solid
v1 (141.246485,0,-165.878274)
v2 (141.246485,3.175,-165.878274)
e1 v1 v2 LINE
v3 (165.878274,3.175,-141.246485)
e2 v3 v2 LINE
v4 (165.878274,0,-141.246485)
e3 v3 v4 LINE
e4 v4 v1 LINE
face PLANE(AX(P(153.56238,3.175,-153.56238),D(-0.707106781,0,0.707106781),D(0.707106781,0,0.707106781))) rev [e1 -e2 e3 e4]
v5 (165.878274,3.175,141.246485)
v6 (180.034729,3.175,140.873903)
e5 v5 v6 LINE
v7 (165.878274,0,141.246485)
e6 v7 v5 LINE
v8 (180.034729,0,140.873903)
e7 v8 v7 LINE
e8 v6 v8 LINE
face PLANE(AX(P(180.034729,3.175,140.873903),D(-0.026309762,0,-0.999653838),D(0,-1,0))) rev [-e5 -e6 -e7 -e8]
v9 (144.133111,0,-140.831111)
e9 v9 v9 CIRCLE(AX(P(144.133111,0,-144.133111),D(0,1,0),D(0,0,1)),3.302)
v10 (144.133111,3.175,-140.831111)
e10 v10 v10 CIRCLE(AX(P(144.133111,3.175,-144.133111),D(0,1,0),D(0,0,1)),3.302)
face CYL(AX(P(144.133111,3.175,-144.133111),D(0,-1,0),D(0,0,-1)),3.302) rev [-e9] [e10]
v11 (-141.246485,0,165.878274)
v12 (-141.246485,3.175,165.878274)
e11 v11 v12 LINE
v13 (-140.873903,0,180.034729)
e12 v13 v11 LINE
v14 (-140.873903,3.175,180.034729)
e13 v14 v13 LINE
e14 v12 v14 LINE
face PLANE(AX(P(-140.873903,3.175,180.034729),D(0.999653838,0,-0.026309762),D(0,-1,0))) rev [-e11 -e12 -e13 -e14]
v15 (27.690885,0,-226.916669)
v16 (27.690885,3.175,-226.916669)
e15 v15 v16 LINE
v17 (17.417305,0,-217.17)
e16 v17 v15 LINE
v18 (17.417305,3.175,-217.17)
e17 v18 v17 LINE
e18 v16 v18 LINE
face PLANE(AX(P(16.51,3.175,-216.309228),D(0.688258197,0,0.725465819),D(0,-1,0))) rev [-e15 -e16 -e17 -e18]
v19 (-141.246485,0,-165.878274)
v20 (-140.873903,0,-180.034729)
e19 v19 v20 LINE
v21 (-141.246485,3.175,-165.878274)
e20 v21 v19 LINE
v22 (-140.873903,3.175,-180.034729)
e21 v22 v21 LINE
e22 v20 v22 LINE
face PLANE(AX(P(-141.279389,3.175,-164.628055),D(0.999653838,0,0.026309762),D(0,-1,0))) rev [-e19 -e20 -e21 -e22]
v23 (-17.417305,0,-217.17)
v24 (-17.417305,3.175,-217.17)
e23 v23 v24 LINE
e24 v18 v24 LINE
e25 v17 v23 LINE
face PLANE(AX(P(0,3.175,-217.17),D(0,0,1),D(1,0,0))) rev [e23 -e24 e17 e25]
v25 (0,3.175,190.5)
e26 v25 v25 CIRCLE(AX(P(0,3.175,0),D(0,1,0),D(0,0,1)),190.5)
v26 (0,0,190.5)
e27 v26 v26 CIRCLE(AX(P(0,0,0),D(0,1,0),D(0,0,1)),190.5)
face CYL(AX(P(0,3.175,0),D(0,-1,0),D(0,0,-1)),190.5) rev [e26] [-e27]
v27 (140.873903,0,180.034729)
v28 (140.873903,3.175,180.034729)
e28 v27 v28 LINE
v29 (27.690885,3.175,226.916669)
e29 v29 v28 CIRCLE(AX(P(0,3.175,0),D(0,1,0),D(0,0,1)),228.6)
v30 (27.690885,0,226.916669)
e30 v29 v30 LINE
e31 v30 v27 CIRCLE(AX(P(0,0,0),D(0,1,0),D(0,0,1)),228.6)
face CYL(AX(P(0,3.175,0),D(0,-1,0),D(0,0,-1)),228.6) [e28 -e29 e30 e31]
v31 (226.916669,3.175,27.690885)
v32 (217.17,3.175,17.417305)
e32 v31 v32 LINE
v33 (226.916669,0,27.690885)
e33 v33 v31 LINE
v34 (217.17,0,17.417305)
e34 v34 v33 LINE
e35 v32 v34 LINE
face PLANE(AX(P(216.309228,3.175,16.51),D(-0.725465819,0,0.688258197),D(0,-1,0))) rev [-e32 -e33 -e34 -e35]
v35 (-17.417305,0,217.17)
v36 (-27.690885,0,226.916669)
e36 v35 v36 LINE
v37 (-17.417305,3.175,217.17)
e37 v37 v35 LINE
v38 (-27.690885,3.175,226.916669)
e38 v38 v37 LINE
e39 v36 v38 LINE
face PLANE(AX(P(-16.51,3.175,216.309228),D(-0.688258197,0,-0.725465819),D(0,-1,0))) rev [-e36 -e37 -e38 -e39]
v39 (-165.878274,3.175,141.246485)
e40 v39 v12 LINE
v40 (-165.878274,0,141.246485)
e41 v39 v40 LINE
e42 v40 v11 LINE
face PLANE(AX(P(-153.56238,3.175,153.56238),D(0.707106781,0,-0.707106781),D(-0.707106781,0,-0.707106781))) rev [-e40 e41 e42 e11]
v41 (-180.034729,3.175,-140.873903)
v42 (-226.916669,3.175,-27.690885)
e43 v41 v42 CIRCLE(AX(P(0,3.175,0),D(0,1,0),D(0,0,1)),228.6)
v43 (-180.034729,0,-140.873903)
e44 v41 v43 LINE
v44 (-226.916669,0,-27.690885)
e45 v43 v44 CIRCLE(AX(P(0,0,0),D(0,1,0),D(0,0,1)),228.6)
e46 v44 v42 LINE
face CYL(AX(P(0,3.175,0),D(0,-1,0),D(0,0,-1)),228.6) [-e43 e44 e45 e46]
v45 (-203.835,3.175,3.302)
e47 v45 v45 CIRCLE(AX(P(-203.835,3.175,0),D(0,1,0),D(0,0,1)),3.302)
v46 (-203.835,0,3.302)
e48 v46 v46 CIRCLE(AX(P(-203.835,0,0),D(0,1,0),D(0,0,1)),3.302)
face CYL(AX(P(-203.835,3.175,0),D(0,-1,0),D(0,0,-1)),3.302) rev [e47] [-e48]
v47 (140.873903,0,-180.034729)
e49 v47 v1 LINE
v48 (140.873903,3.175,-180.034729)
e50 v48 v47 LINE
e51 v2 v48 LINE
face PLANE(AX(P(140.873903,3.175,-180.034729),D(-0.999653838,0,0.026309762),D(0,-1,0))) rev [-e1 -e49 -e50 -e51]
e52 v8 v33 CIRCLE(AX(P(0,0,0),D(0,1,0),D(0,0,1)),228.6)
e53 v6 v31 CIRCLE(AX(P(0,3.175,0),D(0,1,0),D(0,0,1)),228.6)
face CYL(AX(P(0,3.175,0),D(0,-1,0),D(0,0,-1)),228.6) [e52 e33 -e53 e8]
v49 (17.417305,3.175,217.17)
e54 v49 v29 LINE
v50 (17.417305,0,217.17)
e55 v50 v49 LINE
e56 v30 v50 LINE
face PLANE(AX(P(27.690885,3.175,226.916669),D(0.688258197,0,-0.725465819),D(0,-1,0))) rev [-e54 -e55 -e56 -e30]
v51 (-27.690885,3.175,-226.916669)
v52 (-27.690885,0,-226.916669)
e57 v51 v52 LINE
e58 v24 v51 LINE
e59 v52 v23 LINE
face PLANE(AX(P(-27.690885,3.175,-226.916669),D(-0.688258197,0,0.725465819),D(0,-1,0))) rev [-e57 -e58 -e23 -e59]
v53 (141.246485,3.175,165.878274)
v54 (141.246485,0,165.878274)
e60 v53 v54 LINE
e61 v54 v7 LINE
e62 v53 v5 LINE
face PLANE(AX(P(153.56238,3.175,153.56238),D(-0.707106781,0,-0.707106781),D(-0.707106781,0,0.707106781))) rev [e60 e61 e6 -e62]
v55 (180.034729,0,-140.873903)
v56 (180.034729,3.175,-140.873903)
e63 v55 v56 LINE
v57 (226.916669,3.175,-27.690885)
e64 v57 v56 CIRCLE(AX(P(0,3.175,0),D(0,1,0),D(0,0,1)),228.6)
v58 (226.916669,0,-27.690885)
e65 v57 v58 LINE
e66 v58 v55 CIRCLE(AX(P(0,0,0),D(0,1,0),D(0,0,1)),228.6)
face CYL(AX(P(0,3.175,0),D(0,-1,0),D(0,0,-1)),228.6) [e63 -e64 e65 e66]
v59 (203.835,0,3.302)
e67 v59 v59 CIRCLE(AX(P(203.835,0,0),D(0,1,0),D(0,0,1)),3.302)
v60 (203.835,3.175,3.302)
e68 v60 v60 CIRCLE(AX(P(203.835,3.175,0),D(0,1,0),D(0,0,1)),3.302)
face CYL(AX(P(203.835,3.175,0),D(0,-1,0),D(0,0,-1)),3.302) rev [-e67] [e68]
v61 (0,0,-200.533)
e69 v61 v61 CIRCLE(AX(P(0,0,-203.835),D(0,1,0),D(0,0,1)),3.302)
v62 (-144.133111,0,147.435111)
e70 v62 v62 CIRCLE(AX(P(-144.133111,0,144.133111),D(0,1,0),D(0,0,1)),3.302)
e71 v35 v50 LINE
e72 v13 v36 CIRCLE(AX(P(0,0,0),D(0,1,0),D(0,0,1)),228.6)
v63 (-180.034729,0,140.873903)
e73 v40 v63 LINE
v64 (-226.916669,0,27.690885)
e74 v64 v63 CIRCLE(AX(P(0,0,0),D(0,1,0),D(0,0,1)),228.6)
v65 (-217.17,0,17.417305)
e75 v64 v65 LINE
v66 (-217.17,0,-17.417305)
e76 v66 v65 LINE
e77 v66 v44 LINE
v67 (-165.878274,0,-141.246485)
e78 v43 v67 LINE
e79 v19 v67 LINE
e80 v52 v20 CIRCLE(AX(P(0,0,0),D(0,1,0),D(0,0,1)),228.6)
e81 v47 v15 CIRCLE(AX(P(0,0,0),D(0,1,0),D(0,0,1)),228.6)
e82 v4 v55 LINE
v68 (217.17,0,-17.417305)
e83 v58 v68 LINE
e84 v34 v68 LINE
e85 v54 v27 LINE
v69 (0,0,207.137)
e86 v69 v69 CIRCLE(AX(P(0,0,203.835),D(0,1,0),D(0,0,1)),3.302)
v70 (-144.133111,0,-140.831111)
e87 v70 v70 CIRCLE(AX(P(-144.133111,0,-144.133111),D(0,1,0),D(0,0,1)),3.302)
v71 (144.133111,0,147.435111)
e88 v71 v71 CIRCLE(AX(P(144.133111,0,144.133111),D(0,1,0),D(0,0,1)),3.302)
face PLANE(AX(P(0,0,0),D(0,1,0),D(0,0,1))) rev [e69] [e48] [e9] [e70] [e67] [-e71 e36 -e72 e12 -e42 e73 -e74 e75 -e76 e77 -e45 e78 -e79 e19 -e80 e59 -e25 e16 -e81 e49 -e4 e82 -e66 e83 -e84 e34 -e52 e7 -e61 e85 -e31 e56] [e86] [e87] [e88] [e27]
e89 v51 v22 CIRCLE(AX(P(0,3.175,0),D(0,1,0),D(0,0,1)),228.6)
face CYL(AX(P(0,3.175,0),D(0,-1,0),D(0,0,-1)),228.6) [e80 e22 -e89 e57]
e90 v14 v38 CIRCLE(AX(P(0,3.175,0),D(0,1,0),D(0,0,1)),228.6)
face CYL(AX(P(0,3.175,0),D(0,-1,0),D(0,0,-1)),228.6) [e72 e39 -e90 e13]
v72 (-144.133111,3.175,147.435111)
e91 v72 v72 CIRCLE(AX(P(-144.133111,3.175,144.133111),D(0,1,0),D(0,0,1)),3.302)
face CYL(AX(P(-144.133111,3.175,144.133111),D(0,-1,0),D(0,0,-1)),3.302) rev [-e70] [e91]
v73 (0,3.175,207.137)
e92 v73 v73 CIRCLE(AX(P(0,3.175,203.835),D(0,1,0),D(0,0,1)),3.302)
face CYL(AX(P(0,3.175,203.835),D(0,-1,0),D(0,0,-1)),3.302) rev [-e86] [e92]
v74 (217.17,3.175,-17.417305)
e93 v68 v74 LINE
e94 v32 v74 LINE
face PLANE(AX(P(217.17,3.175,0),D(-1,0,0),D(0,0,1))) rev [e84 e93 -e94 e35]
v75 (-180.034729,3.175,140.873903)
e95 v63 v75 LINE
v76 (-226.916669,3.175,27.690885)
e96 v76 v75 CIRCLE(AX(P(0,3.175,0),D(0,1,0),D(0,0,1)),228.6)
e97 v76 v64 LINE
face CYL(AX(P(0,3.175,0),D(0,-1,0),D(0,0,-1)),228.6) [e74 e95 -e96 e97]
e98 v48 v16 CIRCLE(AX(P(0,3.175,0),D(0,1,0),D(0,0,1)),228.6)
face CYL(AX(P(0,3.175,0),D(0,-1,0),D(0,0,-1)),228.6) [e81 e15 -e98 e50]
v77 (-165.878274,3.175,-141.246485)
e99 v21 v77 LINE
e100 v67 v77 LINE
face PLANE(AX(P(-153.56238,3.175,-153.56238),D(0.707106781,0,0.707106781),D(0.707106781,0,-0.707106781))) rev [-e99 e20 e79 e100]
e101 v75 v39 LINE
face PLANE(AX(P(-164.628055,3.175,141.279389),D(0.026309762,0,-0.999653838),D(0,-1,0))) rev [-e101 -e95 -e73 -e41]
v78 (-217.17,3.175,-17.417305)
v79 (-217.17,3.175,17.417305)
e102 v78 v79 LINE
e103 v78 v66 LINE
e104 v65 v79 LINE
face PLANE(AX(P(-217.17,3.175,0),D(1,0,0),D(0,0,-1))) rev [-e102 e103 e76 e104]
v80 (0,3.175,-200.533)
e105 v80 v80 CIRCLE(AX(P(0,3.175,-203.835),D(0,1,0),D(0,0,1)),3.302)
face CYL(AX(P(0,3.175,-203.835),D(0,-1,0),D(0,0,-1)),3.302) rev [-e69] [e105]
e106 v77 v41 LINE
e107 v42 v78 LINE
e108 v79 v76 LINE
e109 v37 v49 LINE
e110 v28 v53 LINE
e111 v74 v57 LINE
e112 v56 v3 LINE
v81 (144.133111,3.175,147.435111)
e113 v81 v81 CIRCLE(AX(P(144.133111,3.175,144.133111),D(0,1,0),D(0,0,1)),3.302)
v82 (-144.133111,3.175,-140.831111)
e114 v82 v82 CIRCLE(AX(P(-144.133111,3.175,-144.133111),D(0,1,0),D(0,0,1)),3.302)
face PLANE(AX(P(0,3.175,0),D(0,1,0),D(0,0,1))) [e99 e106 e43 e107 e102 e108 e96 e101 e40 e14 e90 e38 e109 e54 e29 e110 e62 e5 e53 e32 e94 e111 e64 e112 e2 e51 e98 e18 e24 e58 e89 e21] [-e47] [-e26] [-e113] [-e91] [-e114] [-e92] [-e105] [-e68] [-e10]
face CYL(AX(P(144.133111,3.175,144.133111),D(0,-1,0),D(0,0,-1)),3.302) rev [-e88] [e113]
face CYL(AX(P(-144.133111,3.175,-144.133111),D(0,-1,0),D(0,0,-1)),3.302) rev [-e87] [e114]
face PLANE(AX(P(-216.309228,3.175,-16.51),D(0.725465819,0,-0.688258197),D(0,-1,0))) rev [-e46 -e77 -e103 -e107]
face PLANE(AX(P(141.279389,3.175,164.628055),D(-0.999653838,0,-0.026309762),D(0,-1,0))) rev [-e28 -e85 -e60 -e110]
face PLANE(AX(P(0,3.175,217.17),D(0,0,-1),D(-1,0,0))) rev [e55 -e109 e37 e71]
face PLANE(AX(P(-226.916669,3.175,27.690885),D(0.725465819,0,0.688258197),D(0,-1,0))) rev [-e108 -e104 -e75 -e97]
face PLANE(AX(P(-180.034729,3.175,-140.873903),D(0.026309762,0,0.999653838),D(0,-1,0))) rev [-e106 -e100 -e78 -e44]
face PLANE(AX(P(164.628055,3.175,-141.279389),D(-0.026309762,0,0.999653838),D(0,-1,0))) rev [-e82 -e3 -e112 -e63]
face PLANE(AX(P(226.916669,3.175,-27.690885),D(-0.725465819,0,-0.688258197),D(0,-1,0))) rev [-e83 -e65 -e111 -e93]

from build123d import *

# Parameters (mm, degrees)
SKETCH1_R           = 3.302
SKETCH1_R_2         = 190.5
BOSS_EXTRUDE1_DEPTH = 3.175
CHAMFER1_DEPTH      = 3.175


with BuildPart() as part:
    # Sketch1 → Boss-Extrude1 (new body)
    with BuildSketch(Plane(origin=(0, 0, 0), x_dir=(1, 0, 0), z_dir=(0, 1, 0))):
        with BuildLine():
            Line((228.003026076, -16.51), (217.17, -16.51))
            Line((217.17, -16.51), (217.17, 16.51))
            Line((217.17, 16.51), (228.003026076, 16.51))
            ThreePointArc((228.003026076, 16.51), (211.198861132, 87.481432639), (172.896818827, 149.548152912))
            Line((172.896818827, 149.548152912), (165.236712628, 141.888046713))
            Line((165.236712628, 141.888046713), (141.888046713, 165.236712628))
            Line((141.888046713, 165.236712628), (149.548152912, 172.896818827))
            ThreePointArc((149.548152912, 172.896818827), (87.481432639, 211.198861132), (16.51, 228.003026076))
            Line((16.51, 228.003026076), (16.51, 217.17))
            Line((16.51, 217.17), (-16.51, 217.17))
            Line((-16.51, 217.17), (-16.51, 228.003026076))
            ThreePointArc((-16.51, 228.003026076), (-87.481432639, 211.198861132), (-149.548152912, 172.896818827))
            Line((-149.548152912, 172.896818827), (-141.888046713, 165.236712628))
            Line((-141.888046713, 165.236712628), (-165.236712628, 141.888046713))
            Line((-165.236712628, 141.888046713), (-172.896818827, 149.548152912))
            ThreePointArc((-172.896818827, 149.548152912), (-211.198861132, 87.481432639), (-228.003026076, 16.51))
            Line((-228.003026076, 16.51), (-217.17, 16.51))
            Line((-217.17, 16.51), (-217.17, -16.51))
            Line((-217.17, -16.51), (-228.003026076, -16.51))
            ThreePointArc((-228.003026076, -16.51), (-211.198861132, -87.481432639), (-172.896818827, -149.548152912))
            Line((-172.896818827, -149.548152912), (-165.236712628, -141.888046713))
            Line((-165.236712628, -141.888046713), (-141.888046713, -165.236712628))
            Line((-141.888046713, -165.236712628), (-149.548152912, -172.896818827))
            ThreePointArc((-149.548152912, -172.896818827), (-87.481432639, -211.198861132), (-16.51, -228.003026076))
            Line((-16.51, -228.003026076), (-16.51, -217.17))
            Line((-16.51, -217.17), (16.51, -217.17))
            Line((16.51, -217.17), (16.51, -228.003026076))
            ThreePointArc((16.51, -228.003026076), (87.481432639, -211.198861132), (149.548152912, -172.896818827))
            Line((149.548152912, -172.896818827), (141.888046713, -165.236712628))
            Line((141.888046713, -165.236712628), (165.236712628, -141.888046713))
            Line((165.236712628, -141.888046713), (172.896818827, -149.548152912))
            ThreePointArc((172.896818827, -149.548152912), (211.198861132, -87.481432639), (228.003026076, -16.51))
        make_face()
        with Locations(Location((-144.133110743, -144.133110743, 0), (0, 0, 270))):
            Circle(SKETCH1_R, mode=Mode.SUBTRACT)
        with Locations(Location((0, -203.835, 0), (0, 0, 270))):
            Circle(SKETCH1_R, mode=Mode.SUBTRACT)
        with Locations(Location((144.133110743, -144.133110743, 0), (0, 0, 270))):
            Circle(SKETCH1_R, mode=Mode.SUBTRACT)
        with Locations(Location((203.835, 0, 0), (0, 0, 270))):
            Circle(SKETCH1_R, mode=Mode.SUBTRACT)
        with Locations(Location((-203.835, 0, 0), (0, 0, 270))):
            Circle(SKETCH1_R, mode=Mode.SUBTRACT)
        with Locations(Location((-144.133110743, 144.133110743, 0), (0, 0, 270))):
            Circle(SKETCH1_R, mode=Mode.SUBTRACT)
        with Locations(Location((0, 0, 0), (0, 0, 270))):
            Circle(SKETCH1_R_2, mode=Mode.SUBTRACT)
        with Locations(Location((0, 203.835, 0), (0, 0, 270))):
            Circle(SKETCH1_R, mode=Mode.SUBTRACT)
        with Locations(Location((144.133110743, 144.133110743, 0), (0, 0, 270))):
            Circle(SKETCH1_R, mode=Mode.SUBTRACT)
    extrude(amount=BOSS_EXTRUDE1_DEPTH)

    # Chamfer1: read off the stored shape, not the designer's step
    # Chamfer1 outline → Chamfer1 (cut)
    with BuildSketch(Plane(origin=(0, 0, 0), x_dir=(1, 0, 0), z_dir=(0, 1, 0))):
        with BuildLine():
            ThreePointArc((228.003026076, 16.51), (227.528537531, 22.1071167), (226.916669439, 27.690885335))
            Line((226.916669439, 27.690885335), (217.17, 17.417305498))
            Line((217.17, 17.417305498), (217.17, 16.51))
            Line((217.17, 16.51), (228.003026076, 16.51))
        make_face()
        with BuildLine():
            Line((165.878274498, 141.246484842), (180.034728522, 140.873902927))
            ThreePointArc((180.034728522, 140.873902927), (176.519063933, 145.254879671), (172.896818827, 149.548152912))
            Line((172.896818827, 149.548152912), (165.236712628, 141.888046713))
            Line((165.236712628, 141.888046713), (165.878274498, 141.246484842))
        make_face()
        with BuildLine():
            Line((228.003026076, -16.51), (217.17, -16.51))
            Line((217.17, -16.51), (217.17, -17.417305498))
            Line((217.17, -17.417305498), (226.916669439, -27.690885335))
            ThreePointArc((226.916669439, -27.690885335), (227.528537531, -22.1071167), (228.003026076, -16.51))
        make_face()
        with BuildLine():
            Line((141.246484842, 165.878274498), (141.888046712, 165.236712627))
            Line((141.888046712, 165.236712627), (149.548152912, 172.896818827))
            ThreePointArc((149.548152912, 172.896818827), (145.254879671, 176.519063933), (140.873902927, 180.034728522))
            Line((140.873902927, 180.034728522), (141.246484842, 165.878274498))
        make_face()
        with BuildLine():
            ThreePointArc((172.896818827, -149.548152912), (176.519063933, -145.254879671), (180.034728522, -140.873902927))
            Line((180.034728522, -140.873902927), (165.878274498, -141.246484842))
            Line((165.878274498, -141.246484842), (165.236712627, -141.888046712))
            Line((165.236712627, -141.888046712), (172.896818827, -149.548152912))
        make_face()
        with BuildLine():
            Line((17.417305498, 217.17), (27.690885335, 226.916669439))
            ThreePointArc((27.690885335, 226.916669439), (22.1071167, 227.528537531), (16.51, 228.003026076))
            Line((16.51, 228.003026076), (16.51, 217.17))
            Line((16.51, 217.17), (17.417305498, 217.17))
        make_face()
        with BuildLine():
            Line((149.548152912, -172.896818827), (141.888046713, -165.236712628))
            Line((141.888046713, -165.236712628), (141.246484842, -165.878274498))
            Line((141.246484842, -165.878274498), (140.873902927, -180.034728522))
            ThreePointArc((140.873902927, -180.034728522), (145.254879671, -176.519063933), (149.548152912, -172.896818827))
        make_face()
        with BuildLine():
            Line((-17.417305498, 217.17), (-16.51, 217.17))
            Line((-16.51, 217.17), (-16.51, 228.003026076))
            ThreePointArc((-16.51, 228.003026076), (-22.1071167, 227.528537531), (-27.690885335, 226.916669439))
            Line((-27.690885335, 226.916669439), (-17.417305498, 217.17))
        make_face()
        with BuildLine():
            ThreePointArc((16.51, -228.003026076), (22.1071167, -227.528537531), (27.690885335, -226.916669439))
            Line((27.690885335, -226.916669439), (17.417305498, -217.17))
            Line((17.417305498, -217.17), (16.51, -217.17))
            Line((16.51, -217.17), (16.51, -228.003026076))
        make_face()
        with BuildLine():
            Line((-141.246484842, 165.878274498), (-140.873902927, 180.034728522))
            ThreePointArc((-140.873902927, 180.034728522), (-145.254879671, 176.519063933), (-149.548152912, 172.896818827))
            Line((-149.548152912, 172.896818827), (-141.888046713, 165.236712628))
            Line((-141.888046713, 165.236712628), (-141.246484842, 165.878274498))
        make_face()
        with BuildLine():
            Line((-16.51, -228.003026076), (-16.51, -217.17))
            Line((-16.51, -217.17), (-17.417305498, -217.17))
            Line((-17.417305498, -217.17), (-27.690885335, -226.916669439))
            ThreePointArc((-27.690885335, -226.916669439), (-22.1071167, -227.528537531), (-16.51, -228.003026076))
        make_face()
        with BuildLine():
            Line((-165.878274498, 141.246484842), (-165.236712627, 141.888046712))
            Line((-165.236712627, 141.888046712), (-172.896818827, 149.548152912))
            ThreePointArc((-172.896818827, 149.548152912), (-176.519063933, 145.254879671), (-180.034728522, 140.873902927))
            Line((-180.034728522, 140.873902927), (-165.878274498, 141.246484842))
        make_face()
        with BuildLine():
            ThreePointArc((-149.548152912, -172.896818827), (-145.254879671, -176.519063933), (-140.873902927, -180.034728522))
            Line((-140.873902927, -180.034728522), (-141.246484842, -165.878274498))
            Line((-141.246484842, -165.878274498), (-141.888046712, -165.236712627))
            Line((-141.888046712, -165.236712627), (-149.548152912, -172.896818827))
        make_face()
        with BuildLine():
            Line((-217.17, 17.417305498), (-226.916669439, 27.690885335))
            ThreePointArc((-226.916669439, 27.690885335), (-227.528537531, 22.1071167), (-228.003026076, 16.51))
            Line((-228.003026076, 16.51), (-217.17, 16.51))
            Line((-217.17, 16.51), (-217.17, 17.417305498))
        make_face()
        with BuildLine():
            Line((-172.896818827, -149.548152912), (-165.236712628, -141.888046713))
            Line((-165.236712628, -141.888046713), (-165.878274498, -141.246484842))
            Line((-165.878274498, -141.246484842), (-180.034728522, -140.873902927))
            ThreePointArc((-180.034728522, -140.873902927), (-176.519063933, -145.254879671), (-172.896818827, -149.548152912))
        make_face()
        with BuildLine():
            Line((-217.17, -17.417305498), (-217.17, -16.51))
            Line((-217.17, -16.51), (-228.003026076, -16.51))
            ThreePointArc((-228.003026076, -16.51), (-227.528537531, -22.1071167), (-226.916669439, -27.690885335))
            Line((-226.916669439, -27.690885335), (-217.17, -17.417305498))
        make_face()
    extrude(amount=CHAMFER1_DEPTH, mode=Mode.SUBTRACT)


solid = part.part
